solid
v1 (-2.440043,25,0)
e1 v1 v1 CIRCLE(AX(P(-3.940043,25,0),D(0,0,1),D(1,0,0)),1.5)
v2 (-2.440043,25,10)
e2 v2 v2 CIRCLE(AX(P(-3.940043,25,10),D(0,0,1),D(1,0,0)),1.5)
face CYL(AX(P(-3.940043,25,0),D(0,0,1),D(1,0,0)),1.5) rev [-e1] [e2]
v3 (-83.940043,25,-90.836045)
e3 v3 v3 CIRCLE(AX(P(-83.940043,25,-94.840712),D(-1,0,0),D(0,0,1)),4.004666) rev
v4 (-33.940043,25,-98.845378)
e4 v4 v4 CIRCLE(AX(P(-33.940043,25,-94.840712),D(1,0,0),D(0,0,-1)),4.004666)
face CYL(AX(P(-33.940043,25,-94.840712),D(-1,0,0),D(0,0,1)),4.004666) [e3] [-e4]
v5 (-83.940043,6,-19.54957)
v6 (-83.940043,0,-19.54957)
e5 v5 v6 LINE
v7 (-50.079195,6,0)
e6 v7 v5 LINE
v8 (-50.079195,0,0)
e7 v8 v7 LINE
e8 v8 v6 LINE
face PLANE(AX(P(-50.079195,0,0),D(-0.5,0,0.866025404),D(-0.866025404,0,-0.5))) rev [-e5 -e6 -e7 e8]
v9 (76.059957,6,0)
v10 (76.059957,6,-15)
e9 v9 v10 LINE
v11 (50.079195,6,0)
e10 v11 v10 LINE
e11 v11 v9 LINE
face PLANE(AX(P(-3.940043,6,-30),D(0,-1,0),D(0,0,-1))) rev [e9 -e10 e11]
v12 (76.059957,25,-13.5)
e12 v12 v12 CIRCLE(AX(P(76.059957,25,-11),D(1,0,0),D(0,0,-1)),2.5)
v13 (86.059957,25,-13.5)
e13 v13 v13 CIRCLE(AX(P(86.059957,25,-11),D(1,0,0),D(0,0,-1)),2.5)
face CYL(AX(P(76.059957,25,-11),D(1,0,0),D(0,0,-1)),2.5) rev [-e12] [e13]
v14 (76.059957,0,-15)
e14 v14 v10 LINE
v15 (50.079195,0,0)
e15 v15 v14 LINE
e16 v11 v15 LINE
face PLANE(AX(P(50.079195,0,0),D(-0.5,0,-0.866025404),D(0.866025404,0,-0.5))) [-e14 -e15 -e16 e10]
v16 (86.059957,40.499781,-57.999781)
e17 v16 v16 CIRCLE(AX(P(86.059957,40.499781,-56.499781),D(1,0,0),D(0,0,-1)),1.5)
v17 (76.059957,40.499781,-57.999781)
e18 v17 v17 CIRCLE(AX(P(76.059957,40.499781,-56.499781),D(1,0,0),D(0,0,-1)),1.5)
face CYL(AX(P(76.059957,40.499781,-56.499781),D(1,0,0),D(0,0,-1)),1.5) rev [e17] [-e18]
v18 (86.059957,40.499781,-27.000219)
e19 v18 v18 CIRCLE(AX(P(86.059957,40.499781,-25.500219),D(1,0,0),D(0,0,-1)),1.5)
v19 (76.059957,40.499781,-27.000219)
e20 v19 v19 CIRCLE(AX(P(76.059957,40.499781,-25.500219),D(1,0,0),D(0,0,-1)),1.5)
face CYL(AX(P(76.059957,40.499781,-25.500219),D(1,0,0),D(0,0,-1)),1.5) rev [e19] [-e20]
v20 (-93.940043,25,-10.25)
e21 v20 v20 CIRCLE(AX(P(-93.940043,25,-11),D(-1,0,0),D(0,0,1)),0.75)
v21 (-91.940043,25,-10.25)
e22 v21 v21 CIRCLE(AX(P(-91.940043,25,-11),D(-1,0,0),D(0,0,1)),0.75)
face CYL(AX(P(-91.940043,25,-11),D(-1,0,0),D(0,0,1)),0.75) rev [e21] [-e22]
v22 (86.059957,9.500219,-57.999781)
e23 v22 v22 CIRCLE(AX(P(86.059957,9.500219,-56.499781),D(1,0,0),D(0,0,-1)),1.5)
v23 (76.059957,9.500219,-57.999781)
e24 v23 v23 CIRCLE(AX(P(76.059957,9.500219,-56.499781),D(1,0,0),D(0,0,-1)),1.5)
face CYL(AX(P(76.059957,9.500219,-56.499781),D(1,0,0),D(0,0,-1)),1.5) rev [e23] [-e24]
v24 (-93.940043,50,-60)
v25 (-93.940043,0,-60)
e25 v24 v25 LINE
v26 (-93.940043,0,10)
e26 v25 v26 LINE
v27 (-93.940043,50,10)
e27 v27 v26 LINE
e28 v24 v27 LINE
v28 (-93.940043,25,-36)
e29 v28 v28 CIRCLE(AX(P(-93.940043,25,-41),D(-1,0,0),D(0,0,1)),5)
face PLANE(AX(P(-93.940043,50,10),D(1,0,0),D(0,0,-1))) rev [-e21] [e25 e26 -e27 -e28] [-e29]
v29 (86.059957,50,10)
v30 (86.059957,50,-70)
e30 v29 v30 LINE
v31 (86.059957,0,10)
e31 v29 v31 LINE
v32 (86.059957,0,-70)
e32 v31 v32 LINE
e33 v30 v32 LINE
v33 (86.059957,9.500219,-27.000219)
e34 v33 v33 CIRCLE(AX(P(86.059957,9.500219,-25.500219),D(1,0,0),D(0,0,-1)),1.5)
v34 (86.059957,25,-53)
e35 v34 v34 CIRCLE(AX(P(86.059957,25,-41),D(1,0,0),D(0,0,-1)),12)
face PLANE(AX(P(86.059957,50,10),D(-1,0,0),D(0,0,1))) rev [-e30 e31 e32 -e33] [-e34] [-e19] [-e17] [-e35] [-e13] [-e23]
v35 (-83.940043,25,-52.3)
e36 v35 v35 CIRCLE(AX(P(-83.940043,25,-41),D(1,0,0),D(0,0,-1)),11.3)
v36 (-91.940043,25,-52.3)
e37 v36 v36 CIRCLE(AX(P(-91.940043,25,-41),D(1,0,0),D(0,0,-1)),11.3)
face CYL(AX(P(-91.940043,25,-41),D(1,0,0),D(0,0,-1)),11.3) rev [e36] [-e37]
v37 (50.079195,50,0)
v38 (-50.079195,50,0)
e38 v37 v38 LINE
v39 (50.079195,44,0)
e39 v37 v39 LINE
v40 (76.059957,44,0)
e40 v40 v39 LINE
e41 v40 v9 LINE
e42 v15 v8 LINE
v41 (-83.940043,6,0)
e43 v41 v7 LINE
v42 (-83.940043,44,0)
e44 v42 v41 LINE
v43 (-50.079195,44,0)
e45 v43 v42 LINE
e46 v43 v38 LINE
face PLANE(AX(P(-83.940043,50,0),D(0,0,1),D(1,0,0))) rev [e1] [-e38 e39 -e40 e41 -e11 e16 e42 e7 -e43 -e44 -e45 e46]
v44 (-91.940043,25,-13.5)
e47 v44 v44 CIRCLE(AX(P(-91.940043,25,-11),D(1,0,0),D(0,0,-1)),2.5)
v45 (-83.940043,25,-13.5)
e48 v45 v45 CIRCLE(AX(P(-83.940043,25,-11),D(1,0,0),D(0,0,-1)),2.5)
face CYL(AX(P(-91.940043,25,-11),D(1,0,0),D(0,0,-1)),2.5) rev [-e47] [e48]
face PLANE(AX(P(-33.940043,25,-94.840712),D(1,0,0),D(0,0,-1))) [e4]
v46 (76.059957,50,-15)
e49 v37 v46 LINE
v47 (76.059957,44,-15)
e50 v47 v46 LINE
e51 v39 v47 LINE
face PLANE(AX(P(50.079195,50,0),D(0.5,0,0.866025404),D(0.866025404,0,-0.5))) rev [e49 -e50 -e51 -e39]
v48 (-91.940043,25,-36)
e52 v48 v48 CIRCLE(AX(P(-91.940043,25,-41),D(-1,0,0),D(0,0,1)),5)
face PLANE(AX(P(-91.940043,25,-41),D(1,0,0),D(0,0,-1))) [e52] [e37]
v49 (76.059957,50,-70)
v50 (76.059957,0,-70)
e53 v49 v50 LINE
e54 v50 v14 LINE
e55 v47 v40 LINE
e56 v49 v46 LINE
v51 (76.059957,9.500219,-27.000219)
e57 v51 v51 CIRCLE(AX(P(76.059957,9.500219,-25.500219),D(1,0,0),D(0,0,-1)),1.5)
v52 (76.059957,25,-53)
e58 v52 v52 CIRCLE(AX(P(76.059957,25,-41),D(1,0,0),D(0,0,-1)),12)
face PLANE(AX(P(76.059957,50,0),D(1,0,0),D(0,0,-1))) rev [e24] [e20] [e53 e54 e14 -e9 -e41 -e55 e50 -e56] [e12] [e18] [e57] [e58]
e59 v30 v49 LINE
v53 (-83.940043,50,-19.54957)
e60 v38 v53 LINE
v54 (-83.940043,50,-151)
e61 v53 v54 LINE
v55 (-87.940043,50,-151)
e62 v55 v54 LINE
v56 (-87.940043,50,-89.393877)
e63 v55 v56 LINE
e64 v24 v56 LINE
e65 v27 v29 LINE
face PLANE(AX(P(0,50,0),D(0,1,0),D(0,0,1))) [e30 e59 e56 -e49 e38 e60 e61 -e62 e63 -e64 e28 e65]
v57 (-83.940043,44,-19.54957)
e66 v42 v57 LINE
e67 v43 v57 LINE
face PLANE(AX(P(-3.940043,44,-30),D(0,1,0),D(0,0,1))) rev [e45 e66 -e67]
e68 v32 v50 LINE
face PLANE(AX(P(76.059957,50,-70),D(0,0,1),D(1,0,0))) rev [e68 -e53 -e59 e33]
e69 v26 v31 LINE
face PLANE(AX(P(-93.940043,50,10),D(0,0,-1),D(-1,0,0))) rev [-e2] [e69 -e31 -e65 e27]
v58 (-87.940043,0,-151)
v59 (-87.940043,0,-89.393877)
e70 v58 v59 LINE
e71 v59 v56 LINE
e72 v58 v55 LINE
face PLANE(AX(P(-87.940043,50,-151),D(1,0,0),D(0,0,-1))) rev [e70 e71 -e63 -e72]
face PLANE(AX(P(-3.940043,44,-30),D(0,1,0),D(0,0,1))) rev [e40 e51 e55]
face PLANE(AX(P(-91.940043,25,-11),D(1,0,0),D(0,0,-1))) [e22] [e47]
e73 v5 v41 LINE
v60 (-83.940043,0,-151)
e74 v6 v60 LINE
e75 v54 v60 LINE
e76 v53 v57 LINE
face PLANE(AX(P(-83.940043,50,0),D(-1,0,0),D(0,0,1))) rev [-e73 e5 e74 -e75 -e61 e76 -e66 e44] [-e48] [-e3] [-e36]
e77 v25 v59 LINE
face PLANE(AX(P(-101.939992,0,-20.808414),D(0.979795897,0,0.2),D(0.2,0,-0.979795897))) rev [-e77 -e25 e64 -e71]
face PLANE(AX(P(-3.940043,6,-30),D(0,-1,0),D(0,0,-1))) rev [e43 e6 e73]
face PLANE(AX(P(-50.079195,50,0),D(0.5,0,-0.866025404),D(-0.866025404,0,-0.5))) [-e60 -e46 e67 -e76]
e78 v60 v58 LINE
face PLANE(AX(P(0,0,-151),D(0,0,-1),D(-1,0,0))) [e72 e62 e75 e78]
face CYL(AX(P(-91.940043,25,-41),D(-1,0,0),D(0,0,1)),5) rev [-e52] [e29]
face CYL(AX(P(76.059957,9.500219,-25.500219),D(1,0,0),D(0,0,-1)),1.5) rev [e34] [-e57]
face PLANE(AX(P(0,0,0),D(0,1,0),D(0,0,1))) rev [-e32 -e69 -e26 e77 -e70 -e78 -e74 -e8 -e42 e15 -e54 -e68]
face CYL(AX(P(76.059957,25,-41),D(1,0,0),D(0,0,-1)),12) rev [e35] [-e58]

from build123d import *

# Parameters (mm, degrees)
BOSS_EXTRUDE1_DEPTH = 50
SKETCH3_R           = 2.5
SKETCH3_R_2         = 12
SKETCH3_R_3         = 1.5
CUT_EXTRUDE1_DEPTH  = 10
RIB1_REACH          = 129.376
SKETCH4_WALL_W      = 286.752677288
SKETCH4_WALL_H      = 6
MIRROR2_DEPTH       = 6
MIRROR2_START       = 44
MIRROR2_2_DEPTH     = 6
SKETCH5_R           = 11.3
SKETCH5_R_2         = 2.5
CUT_EXTRUDE2_DEPTH  = 8
SKETCH6_R           = 5
SKETCH6_R_2         = 0.75
CUT_EXTRUDE3_DEPTH  = 2
SKETCH8_W           = 4
SKETCH8_H           = 50
BOSS_EXTRUDE2_DEPTH = 91
BOSS_EXTRUDE3_DEPTH = 50
SKETCH11_R          = 1.5
CUT_EXTRUDE4_DEPTH  = 10
SKETCH12_R          = 4.004666462
BOSS_EXTRUDE4_DEPTH = 50


# Read off the part's stored shape, not the designer's step: Mirror2
with BuildPart() as part:
    # Sketch2 → Boss-Extrude1 (new body)
    with BuildSketch(Plane(origin=(0, 0, 0), x_dir=(1, 0, 0), z_dir=(0, 1, 0))):
        Polygon((-83.940042827, 0), (76.059957173, 0), (76.059957173, 70), (86.059957173, 70), (86.059957173, -10), (-93.940042827, -10), (-93.940042827, 60), (-83.940042827, 60), align=None)
    extrude(amount=BOSS_EXTRUDE1_DEPTH)

    # Sketch3 → Cut-Extrude1 (cut)
    with BuildSketch(Plane(origin=(86.059957173, 0, 0), x_dir=(0, 0, -1), z_dir=(1, 0, 0))):
        with Locations((11, 25)):
            Circle(SKETCH3_R)
        with Locations((41, 25)):
            Circle(SKETCH3_R_2)
        with Locations((25.500219356, 40.499780644)):
            Circle(SKETCH3_R_3)
        with Locations((56.499780644, 40.499780644)):
            Circle(SKETCH3_R_3)
        with Locations((56.499780644, 9.500219356)):
            Circle(SKETCH3_R_3)
        with Locations((25.500219356, 9.500219356)):
            Circle(SKETCH3_R_3)
    extrude(amount=-CUT_EXTRUDE1_DEPTH, mode=Mode.SUBTRACT)

    # Sketch4 wall → Rib1 (add, up to next)
    with BuildSketch(Plane(origin=(63.069576117, 50, -7.5), x_dir=(0.86602540378, 0, -0.500000000008), z_dir=(-0.500000000008, 0, -0.86602540378)), mode=Mode.PRIVATE) as rib1_sk1:
        with Locations((0, 3)):
            Rectangle(SKETCH4_WALL_W, SKETCH4_WALL_H)
    rib1_tool1 = extrude(rib1_sk1.sketch, amount=-RIB1_REACH, mode=Mode.PRIVATE) - part.part
    rib1 = rib1_tool1.solids().sort_by_distance((63.069576117, 50, -7.5))[0]
    add(rib1)

    # Mirror1: Rib1 across plane
    add(rib1.mirror(Plane.ZX.offset(25)))

    # Mirror2 outline → Mirror2 (add)
    with BuildSketch(Plane(origin=(0, 0, 0), x_dir=(1, 0, 0), z_dir=(0, 1, 0))):
        Polygon((-83.940042827, 0), (-50.07919506, 0), (-83.940042827, 19.549569573), align=None)
    extrude(amount=MIRROR2_DEPTH)

    # Mirror2 2 outline → Mirror2 2 (add)
    with BuildSketch(Plane(origin=(0, 0, 0), x_dir=(1, 0, 0), z_dir=(0, 1, 0)).offset(MIRROR2_START)):
        Polygon((-83.940042827, 0), (-50.07919506, 0), (-83.940042827, 19.549569573), align=None)
    extrude(amount=MIRROR2_2_DEPTH)

    # Sketch5 → Cut-Extrude2 (cut)
    with BuildSketch(Plane(origin=(-83.940042827, 0, 0), x_dir=(0, 0, -1), z_dir=(1, 0, 0))):
        with Locations((41, 25)):
            Circle(SKETCH5_R)
        with Locations((11, 25)):
            Circle(SKETCH5_R_2)
    extrude(amount=-CUT_EXTRUDE2_DEPTH, mode=Mode.SUBTRACT)

    # Sketch6 → Cut-Extrude3 (cut)
    with BuildSketch(Plane.ZY.offset(93.940042827)):
        with Locations((-41, 25)):
            Circle(SKETCH6_R)
        with Locations((-11, 25)):
            Circle(SKETCH6_R_2)
    extrude(amount=-CUT_EXTRUDE3_DEPTH, mode=Mode.SUBTRACT)

    # Sketch8 → Boss-Extrude2 (add)
    with BuildSketch(Plane(origin=(0, 0, -60), x_dir=(-1, 0, 0), z_dir=(0, 0, -1))):
        with Locations((85.940042827, 25)):
            Rectangle(SKETCH8_W, SKETCH8_H)
    extrude(amount=BOSS_EXTRUDE2_DEPTH)

    # Sketch9 → Boss-Extrude3 (add)
    with BuildSketch(Plane(origin=(0, 50, 0), x_dir=(1, 0, 0), z_dir=(0, 1, 0))):
        Polygon((-87.940042827, 89.393876913), (-93.940042827, 60), (-87.940042827, 60), align=None)
    extrude(amount=-BOSS_EXTRUDE3_DEPTH)

    # Sketch11 → Cut-Extrude4 (cut)
    with BuildSketch(Plane.XY.offset(10)):
        with Locations((-3.940042827, 25)):
            Circle(SKETCH11_R)
    extrude(amount=-CUT_EXTRUDE4_DEPTH, mode=Mode.SUBTRACT)

    # Sketch12 → Boss-Extrude4 (add)
    with BuildSketch(Plane(origin=(-83.940042827, 0, 0), x_dir=(0, 0, -1), z_dir=(1, 0, 0))):
        with Locations(Location((94.840711844, 25, 0), (0, 0, 180))):
            Circle(SKETCH12_R)
    extrude(amount=BOSS_EXTRUDE4_DEPTH)


solid = part.part
